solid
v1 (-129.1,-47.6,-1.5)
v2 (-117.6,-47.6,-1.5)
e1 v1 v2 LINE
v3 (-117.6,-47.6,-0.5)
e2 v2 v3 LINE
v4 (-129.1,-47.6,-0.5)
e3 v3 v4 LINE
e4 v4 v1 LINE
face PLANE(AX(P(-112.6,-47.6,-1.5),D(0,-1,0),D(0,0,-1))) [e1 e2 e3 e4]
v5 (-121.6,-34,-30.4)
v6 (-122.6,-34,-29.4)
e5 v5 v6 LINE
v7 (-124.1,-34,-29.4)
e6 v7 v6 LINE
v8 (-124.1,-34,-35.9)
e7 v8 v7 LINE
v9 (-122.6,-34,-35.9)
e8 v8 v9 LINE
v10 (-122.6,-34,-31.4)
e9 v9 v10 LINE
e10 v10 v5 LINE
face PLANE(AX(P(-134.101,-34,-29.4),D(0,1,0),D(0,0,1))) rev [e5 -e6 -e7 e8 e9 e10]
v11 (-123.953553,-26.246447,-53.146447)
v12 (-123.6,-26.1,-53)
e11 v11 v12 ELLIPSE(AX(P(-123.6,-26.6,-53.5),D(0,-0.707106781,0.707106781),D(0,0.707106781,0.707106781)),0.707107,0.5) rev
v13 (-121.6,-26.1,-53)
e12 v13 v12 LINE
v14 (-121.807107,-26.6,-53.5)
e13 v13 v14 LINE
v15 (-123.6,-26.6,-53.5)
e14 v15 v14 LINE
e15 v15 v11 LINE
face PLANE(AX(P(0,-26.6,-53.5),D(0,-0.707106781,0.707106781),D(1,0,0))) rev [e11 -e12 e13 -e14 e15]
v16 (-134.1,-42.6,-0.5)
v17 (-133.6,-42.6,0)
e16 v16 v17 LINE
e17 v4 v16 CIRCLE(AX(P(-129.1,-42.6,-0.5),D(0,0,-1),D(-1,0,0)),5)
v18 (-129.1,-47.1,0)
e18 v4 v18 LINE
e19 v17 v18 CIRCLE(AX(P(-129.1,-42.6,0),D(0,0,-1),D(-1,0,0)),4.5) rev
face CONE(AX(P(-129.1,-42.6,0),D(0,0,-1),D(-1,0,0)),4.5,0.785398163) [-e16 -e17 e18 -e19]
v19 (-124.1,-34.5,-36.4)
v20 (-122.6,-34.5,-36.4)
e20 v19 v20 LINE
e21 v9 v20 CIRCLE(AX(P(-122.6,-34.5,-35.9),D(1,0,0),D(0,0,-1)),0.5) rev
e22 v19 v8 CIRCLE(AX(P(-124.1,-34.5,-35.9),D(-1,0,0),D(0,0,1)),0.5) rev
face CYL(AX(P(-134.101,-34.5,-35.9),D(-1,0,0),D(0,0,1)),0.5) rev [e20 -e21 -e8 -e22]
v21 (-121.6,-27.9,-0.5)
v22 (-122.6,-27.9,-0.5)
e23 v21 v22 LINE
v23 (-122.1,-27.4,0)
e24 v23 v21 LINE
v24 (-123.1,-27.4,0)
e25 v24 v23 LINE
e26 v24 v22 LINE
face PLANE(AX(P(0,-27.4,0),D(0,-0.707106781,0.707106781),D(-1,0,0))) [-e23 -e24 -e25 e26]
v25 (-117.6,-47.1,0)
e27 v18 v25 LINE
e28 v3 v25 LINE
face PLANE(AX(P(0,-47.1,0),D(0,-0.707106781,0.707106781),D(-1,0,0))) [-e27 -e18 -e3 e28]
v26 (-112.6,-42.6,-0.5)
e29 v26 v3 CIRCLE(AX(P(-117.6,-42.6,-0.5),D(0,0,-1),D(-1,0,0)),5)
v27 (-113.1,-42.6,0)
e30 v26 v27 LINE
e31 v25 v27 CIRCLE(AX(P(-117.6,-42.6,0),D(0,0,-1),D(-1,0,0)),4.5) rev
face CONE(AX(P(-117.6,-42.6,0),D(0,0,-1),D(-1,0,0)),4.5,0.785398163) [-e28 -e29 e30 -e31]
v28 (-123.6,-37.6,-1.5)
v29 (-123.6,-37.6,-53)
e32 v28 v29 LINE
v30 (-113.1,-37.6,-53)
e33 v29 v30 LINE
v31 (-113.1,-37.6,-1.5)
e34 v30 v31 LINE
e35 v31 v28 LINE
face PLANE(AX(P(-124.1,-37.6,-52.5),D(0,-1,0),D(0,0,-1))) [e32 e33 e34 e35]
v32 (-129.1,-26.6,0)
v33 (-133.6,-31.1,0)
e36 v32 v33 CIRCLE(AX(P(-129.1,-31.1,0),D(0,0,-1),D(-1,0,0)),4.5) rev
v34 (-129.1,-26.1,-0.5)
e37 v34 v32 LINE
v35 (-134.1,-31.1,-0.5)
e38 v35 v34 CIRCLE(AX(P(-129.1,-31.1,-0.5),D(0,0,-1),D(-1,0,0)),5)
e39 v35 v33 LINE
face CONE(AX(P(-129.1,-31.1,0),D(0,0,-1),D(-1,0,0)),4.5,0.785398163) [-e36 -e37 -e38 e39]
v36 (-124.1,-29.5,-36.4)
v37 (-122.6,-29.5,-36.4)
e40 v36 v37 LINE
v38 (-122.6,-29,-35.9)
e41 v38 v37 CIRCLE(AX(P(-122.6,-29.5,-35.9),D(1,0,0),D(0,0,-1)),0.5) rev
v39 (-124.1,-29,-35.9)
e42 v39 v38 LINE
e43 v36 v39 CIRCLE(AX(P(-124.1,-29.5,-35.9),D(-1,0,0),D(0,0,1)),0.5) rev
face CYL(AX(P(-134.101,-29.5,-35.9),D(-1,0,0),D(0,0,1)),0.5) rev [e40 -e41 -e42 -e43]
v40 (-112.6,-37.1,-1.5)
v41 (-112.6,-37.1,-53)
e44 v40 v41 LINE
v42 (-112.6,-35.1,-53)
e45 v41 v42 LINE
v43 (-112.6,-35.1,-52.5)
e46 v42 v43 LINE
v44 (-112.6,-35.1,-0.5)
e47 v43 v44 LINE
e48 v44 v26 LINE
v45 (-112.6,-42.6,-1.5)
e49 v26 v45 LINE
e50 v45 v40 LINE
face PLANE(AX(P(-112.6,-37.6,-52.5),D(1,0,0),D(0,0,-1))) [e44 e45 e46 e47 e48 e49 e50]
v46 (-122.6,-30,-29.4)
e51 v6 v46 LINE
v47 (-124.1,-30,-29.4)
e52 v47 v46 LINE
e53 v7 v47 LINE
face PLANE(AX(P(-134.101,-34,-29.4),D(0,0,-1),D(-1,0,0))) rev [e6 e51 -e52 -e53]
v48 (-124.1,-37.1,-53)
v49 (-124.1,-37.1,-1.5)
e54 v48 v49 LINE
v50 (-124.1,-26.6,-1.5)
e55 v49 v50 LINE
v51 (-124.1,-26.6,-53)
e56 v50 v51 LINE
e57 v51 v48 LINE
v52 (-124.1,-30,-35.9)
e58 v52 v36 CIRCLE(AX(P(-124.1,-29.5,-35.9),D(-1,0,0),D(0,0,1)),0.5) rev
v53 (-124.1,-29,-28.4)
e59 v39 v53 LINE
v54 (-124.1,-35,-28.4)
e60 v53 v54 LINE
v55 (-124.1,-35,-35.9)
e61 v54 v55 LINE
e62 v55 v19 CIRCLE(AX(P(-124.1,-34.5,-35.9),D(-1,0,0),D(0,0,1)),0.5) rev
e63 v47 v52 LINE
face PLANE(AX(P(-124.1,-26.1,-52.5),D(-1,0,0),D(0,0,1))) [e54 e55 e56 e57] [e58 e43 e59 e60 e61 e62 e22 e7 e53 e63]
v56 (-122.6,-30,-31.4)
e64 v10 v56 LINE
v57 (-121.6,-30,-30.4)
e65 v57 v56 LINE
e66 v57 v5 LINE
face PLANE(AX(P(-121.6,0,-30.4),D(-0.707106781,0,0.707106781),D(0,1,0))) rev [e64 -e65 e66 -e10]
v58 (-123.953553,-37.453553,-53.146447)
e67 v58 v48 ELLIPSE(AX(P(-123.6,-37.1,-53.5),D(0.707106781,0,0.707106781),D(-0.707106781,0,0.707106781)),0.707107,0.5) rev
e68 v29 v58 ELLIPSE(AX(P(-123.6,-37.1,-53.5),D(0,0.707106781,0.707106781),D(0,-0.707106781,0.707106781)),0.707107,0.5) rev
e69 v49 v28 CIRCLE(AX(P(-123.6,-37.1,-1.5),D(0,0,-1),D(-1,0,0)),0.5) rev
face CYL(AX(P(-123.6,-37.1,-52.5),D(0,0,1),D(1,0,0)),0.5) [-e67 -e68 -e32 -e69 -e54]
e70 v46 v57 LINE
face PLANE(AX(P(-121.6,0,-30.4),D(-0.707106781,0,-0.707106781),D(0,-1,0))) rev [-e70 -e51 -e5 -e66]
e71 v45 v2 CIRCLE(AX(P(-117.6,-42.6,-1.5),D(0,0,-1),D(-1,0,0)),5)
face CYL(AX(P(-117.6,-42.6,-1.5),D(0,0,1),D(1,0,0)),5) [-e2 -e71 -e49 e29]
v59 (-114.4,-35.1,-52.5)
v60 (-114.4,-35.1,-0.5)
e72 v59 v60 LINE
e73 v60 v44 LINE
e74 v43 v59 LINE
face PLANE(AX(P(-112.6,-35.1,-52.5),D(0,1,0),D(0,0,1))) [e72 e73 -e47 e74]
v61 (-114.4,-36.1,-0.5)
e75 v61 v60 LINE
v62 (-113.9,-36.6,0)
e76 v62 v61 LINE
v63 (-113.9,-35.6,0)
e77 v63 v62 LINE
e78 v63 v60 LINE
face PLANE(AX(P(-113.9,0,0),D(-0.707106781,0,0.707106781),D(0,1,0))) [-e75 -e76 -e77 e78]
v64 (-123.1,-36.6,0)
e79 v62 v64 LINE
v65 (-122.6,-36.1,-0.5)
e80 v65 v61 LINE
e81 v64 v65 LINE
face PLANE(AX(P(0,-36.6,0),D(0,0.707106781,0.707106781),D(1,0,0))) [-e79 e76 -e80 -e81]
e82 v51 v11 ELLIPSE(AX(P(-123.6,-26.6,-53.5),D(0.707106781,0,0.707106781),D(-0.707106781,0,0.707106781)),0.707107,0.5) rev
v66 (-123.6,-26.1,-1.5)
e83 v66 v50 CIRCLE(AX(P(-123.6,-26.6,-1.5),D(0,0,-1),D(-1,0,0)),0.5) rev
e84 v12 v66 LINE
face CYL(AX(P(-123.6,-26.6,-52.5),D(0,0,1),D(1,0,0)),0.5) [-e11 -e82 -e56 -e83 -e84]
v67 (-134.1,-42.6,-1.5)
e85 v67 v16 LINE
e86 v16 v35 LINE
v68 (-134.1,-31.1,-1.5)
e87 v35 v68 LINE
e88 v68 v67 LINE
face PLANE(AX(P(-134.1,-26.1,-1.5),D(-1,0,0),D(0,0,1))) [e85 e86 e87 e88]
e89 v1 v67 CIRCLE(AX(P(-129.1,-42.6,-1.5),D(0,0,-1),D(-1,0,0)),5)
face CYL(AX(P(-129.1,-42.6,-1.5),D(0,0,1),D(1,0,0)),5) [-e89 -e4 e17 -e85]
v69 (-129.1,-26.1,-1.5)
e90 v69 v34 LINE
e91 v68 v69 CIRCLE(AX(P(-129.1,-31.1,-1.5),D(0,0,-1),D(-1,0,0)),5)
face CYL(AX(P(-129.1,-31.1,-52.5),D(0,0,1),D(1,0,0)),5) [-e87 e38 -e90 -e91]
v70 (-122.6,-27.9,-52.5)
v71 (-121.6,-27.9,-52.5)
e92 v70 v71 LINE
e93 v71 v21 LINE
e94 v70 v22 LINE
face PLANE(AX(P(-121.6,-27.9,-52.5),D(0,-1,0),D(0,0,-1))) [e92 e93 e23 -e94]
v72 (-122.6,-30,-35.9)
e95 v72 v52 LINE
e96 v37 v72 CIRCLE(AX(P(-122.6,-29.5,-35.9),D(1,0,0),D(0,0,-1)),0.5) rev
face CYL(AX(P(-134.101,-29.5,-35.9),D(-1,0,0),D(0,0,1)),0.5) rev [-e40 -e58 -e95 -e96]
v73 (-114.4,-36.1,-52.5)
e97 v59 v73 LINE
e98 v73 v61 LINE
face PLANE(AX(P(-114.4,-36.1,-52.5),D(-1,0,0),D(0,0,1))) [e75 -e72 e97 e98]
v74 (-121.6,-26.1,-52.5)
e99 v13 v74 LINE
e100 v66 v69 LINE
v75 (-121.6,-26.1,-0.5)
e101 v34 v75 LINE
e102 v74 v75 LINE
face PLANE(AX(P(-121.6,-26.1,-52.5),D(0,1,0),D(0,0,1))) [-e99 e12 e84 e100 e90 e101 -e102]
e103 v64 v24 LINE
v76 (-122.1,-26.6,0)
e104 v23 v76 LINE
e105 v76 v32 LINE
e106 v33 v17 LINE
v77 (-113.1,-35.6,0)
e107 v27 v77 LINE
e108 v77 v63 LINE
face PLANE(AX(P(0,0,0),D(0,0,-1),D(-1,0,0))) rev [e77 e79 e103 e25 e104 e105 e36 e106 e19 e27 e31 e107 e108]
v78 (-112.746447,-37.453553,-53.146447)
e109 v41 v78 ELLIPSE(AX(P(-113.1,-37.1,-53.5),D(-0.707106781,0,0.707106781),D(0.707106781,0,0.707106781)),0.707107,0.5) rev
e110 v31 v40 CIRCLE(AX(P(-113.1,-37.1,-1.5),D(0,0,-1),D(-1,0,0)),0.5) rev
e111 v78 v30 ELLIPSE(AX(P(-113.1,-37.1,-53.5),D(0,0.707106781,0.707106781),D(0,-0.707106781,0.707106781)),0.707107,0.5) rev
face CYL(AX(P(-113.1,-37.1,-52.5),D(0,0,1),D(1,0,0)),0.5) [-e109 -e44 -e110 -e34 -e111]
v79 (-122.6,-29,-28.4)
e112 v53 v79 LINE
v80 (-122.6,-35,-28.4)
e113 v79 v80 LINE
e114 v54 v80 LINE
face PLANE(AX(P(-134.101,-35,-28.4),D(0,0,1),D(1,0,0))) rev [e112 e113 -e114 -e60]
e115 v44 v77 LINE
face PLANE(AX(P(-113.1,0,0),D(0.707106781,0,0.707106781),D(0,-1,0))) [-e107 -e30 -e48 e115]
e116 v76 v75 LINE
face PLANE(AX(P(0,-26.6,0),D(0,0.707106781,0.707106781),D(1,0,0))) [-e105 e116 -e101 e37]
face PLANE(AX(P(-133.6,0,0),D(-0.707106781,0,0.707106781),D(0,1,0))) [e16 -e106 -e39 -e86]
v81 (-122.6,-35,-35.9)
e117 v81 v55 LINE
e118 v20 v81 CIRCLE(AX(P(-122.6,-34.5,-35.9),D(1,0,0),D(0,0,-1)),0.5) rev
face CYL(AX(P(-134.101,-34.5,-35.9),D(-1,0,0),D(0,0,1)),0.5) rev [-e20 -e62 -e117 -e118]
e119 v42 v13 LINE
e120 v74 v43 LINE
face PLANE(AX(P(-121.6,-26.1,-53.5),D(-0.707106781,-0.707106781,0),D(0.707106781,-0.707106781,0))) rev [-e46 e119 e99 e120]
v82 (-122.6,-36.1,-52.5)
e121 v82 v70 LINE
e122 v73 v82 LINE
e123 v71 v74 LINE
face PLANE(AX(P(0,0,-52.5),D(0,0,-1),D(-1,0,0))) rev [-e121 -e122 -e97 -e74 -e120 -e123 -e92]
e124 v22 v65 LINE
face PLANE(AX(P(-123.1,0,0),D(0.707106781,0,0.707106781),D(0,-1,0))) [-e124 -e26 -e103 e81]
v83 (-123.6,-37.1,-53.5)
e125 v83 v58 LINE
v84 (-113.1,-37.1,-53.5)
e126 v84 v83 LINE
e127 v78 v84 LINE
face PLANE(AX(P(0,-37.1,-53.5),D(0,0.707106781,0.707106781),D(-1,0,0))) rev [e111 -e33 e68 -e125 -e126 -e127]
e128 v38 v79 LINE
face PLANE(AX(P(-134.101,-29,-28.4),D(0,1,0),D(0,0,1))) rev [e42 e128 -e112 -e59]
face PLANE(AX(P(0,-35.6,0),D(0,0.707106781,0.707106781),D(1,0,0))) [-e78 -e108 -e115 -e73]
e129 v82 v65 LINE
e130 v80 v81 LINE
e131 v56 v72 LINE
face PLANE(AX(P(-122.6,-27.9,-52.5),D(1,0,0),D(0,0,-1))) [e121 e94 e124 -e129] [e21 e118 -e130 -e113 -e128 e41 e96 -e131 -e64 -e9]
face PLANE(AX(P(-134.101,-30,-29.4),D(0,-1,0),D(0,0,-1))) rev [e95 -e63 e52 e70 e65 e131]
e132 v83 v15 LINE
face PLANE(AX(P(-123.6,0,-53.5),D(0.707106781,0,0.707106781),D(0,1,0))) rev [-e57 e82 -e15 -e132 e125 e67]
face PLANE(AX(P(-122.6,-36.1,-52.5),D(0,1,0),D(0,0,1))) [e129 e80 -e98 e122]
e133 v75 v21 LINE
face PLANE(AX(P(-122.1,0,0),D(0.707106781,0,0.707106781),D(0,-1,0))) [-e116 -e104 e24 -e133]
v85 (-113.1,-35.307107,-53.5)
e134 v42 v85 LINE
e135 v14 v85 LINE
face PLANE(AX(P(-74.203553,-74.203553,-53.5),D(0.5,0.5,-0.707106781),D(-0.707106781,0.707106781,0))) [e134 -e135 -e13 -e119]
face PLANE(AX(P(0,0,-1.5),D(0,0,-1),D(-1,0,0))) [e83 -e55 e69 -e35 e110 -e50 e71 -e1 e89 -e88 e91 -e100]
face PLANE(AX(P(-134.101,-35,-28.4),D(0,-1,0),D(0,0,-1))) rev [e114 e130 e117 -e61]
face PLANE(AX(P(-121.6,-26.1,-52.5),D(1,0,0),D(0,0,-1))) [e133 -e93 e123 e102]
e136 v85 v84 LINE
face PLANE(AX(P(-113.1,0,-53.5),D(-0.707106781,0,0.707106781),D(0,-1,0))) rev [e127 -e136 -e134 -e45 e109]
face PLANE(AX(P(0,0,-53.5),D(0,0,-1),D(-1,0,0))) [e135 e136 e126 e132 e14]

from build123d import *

# Parameters (mm, degrees)
BOSS_EXTRUDE1_DEPTH = 52.5
BOSS_EXTRUDE2_DEPTH = 1.5
CUT_EXTRUDE1_REACH  = 73.793
SKETCH5_W           = 2
SKETCH5_H           = 4
BOSS_EXTRUDE3_DEPTH = 1
FILLET1_R           = 5
BOSS_EXTRUDE4_DEPTH = 1
CHAMFER3_SIZE       = 0.5
CHAMFER4_SIZE       = 1
FILLET3_R           = 0.5
FILLET4_R           = 0.5


with BuildPart() as part:
    # Sketch1 → Boss-Extrude1 (new body)
    with BuildSketch(Plane.XY):
        Polygon((-121.6, -26.1), (-124.1, -26.1), (-124.1, -37.6), (-112.6, -37.6), (-112.6, -35.1), (-114.4, -35.1), (-114.4, -36.1), (-122.6, -36.1), (-122.6, -27.9), (-121.6, -27.9), align=None)
    extrude(amount=-BOSS_EXTRUDE1_DEPTH)

    # Sketch2 → Boss-Extrude2 (add)
    with BuildSketch(Plane.XY):
        Polygon((-124.1, -26.1), (-134.1, -26.1), (-134.1, -47.6), (-112.6, -47.6), (-112.6, -37.6), (-124.1, -37.6), align=None)
    extrude(amount=-BOSS_EXTRUDE2_DEPTH)

    # Sketch4 → Cut-Extrude1 (cut, up to next)
    with BuildSketch(Plane(origin=(-122.6, 0, 0), x_dir=(0, 0, -1), z_dir=(1, 0, 0)), mode=Mode.PRIVATE) as cut_extrude1_sk1:
        Polygon((36.4, -30), (36.4, -29), (28.4, -29), (28.4, -35), (36.4, -35), (36.4, -34), (29.4, -34), (29.4, -30), align=None)
    cut_extrude1_tool1 = extrude(cut_extrude1_sk1.sketch, amount=-CUT_EXTRUDE1_REACH, mode=Mode.PRIVATE) & part.part
    add(cut_extrude1_tool1.solids().sort_by_distance((-122.6, -29.5, -36.3))[0], mode=Mode.SUBTRACT)

    # Sketch5 → Boss-Extrude3 (add)
    with BuildSketch(Plane(origin=(-122.6, 0, 0), x_dir=(0, 0, -1), z_dir=(1, 0, 0))):
        with Locations((30.4, -32)):
            Rectangle(SKETCH5_W, SKETCH5_H)
    extrude(amount=BOSS_EXTRUDE3_DEPTH)

    # Fillet1
    fillet1_edges = [part.edges().sort_by_distance(p)[0] for p in [
        (-112.6, -47.6, -0.75),
        (-134.1, -47.6, -0.75),
        (-134.1, -26.1, -0.75),
    ]]
    fillet(fillet1_edges, radius=FILLET1_R)

    # Sketch6 → Boss-Extrude4 (add)
    with BuildSketch(Plane(origin=(0, 0, -52.5), x_dir=(-1, 0, 0), z_dir=(0, 0, -1))):
        Polygon((112.6, -35.1), (112.6, -37.6), (124.1, -37.6), (124.1, -26.1), (121.6, -26.1), align=None)
    extrude(amount=BOSS_EXTRUDE4_DEPTH)

    # Chamfer3
    chamfer3_edges = [part.edges().sort_by_distance(p)[0] for p in [
        (-118.5, -36.1, 0),
        (-114.4, -35.6, 0),
        (-117.1, -30.6, -53.5),
        (-113.5, -35.1, 0),
        (-112.6, -36.35, -53.5),
        (-118.35, -37.6, -53.5),
        (-124.1, -31.85, -53.5),
        (-122.85, -26.1, -53.5),
        (-125.35, -26.1, 0),
        (-121.6, -27, 0),
        (-134.1, -36.85, 0),
        (-123.35, -47.6, 0),
        (-112.6, -38.85, 0),
        (-114.064466094, -46.135533906, 0),
        (-132.635533906, -46.135533906, 0),
        (-132.635533906, -27.564466094, 0),
        (-122.1, -27.9, 0),
        (-122.6, -32, 0),
    ]]
    chamfer(chamfer3_edges, length=CHAMFER3_SIZE)

    # Chamfer4
    chamfer4_edges = [part.edges().sort_by_distance(p)[0] for p in [
        (-121.6, -32, -31.4),
        (-121.6, -32, -29.4),
    ]]
    chamfer(chamfer4_edges, length=CHAMFER4_SIZE - 0.0001)  # a hair under: the kernel refuses the full size

    # Fillet3
    fillet3_edges = [part.edges().sort_by_distance(p)[0] for p in [
        (-123.35, -29, -36.4),
        (-123.35, -30, -36.4),
        (-123.35, -34, -36.4),
        (-123.35, -35, -36.4),
    ]]
    fillet(fillet3_edges, radius=FILLET3_R - 0.0001)  # a hair under: the kernel refuses the full size

    # Fillet4
    fillet4_edges = [part.edges().sort_by_distance(p)[0] for p in [
        (-124.1, -26.1, -27.25),
        (-124.1, -37.6, -27.25),
        (-112.6, -37.6, -27.25),
    ]]
    fillet(fillet4_edges, radius=FILLET4_R)


solid = part.part
